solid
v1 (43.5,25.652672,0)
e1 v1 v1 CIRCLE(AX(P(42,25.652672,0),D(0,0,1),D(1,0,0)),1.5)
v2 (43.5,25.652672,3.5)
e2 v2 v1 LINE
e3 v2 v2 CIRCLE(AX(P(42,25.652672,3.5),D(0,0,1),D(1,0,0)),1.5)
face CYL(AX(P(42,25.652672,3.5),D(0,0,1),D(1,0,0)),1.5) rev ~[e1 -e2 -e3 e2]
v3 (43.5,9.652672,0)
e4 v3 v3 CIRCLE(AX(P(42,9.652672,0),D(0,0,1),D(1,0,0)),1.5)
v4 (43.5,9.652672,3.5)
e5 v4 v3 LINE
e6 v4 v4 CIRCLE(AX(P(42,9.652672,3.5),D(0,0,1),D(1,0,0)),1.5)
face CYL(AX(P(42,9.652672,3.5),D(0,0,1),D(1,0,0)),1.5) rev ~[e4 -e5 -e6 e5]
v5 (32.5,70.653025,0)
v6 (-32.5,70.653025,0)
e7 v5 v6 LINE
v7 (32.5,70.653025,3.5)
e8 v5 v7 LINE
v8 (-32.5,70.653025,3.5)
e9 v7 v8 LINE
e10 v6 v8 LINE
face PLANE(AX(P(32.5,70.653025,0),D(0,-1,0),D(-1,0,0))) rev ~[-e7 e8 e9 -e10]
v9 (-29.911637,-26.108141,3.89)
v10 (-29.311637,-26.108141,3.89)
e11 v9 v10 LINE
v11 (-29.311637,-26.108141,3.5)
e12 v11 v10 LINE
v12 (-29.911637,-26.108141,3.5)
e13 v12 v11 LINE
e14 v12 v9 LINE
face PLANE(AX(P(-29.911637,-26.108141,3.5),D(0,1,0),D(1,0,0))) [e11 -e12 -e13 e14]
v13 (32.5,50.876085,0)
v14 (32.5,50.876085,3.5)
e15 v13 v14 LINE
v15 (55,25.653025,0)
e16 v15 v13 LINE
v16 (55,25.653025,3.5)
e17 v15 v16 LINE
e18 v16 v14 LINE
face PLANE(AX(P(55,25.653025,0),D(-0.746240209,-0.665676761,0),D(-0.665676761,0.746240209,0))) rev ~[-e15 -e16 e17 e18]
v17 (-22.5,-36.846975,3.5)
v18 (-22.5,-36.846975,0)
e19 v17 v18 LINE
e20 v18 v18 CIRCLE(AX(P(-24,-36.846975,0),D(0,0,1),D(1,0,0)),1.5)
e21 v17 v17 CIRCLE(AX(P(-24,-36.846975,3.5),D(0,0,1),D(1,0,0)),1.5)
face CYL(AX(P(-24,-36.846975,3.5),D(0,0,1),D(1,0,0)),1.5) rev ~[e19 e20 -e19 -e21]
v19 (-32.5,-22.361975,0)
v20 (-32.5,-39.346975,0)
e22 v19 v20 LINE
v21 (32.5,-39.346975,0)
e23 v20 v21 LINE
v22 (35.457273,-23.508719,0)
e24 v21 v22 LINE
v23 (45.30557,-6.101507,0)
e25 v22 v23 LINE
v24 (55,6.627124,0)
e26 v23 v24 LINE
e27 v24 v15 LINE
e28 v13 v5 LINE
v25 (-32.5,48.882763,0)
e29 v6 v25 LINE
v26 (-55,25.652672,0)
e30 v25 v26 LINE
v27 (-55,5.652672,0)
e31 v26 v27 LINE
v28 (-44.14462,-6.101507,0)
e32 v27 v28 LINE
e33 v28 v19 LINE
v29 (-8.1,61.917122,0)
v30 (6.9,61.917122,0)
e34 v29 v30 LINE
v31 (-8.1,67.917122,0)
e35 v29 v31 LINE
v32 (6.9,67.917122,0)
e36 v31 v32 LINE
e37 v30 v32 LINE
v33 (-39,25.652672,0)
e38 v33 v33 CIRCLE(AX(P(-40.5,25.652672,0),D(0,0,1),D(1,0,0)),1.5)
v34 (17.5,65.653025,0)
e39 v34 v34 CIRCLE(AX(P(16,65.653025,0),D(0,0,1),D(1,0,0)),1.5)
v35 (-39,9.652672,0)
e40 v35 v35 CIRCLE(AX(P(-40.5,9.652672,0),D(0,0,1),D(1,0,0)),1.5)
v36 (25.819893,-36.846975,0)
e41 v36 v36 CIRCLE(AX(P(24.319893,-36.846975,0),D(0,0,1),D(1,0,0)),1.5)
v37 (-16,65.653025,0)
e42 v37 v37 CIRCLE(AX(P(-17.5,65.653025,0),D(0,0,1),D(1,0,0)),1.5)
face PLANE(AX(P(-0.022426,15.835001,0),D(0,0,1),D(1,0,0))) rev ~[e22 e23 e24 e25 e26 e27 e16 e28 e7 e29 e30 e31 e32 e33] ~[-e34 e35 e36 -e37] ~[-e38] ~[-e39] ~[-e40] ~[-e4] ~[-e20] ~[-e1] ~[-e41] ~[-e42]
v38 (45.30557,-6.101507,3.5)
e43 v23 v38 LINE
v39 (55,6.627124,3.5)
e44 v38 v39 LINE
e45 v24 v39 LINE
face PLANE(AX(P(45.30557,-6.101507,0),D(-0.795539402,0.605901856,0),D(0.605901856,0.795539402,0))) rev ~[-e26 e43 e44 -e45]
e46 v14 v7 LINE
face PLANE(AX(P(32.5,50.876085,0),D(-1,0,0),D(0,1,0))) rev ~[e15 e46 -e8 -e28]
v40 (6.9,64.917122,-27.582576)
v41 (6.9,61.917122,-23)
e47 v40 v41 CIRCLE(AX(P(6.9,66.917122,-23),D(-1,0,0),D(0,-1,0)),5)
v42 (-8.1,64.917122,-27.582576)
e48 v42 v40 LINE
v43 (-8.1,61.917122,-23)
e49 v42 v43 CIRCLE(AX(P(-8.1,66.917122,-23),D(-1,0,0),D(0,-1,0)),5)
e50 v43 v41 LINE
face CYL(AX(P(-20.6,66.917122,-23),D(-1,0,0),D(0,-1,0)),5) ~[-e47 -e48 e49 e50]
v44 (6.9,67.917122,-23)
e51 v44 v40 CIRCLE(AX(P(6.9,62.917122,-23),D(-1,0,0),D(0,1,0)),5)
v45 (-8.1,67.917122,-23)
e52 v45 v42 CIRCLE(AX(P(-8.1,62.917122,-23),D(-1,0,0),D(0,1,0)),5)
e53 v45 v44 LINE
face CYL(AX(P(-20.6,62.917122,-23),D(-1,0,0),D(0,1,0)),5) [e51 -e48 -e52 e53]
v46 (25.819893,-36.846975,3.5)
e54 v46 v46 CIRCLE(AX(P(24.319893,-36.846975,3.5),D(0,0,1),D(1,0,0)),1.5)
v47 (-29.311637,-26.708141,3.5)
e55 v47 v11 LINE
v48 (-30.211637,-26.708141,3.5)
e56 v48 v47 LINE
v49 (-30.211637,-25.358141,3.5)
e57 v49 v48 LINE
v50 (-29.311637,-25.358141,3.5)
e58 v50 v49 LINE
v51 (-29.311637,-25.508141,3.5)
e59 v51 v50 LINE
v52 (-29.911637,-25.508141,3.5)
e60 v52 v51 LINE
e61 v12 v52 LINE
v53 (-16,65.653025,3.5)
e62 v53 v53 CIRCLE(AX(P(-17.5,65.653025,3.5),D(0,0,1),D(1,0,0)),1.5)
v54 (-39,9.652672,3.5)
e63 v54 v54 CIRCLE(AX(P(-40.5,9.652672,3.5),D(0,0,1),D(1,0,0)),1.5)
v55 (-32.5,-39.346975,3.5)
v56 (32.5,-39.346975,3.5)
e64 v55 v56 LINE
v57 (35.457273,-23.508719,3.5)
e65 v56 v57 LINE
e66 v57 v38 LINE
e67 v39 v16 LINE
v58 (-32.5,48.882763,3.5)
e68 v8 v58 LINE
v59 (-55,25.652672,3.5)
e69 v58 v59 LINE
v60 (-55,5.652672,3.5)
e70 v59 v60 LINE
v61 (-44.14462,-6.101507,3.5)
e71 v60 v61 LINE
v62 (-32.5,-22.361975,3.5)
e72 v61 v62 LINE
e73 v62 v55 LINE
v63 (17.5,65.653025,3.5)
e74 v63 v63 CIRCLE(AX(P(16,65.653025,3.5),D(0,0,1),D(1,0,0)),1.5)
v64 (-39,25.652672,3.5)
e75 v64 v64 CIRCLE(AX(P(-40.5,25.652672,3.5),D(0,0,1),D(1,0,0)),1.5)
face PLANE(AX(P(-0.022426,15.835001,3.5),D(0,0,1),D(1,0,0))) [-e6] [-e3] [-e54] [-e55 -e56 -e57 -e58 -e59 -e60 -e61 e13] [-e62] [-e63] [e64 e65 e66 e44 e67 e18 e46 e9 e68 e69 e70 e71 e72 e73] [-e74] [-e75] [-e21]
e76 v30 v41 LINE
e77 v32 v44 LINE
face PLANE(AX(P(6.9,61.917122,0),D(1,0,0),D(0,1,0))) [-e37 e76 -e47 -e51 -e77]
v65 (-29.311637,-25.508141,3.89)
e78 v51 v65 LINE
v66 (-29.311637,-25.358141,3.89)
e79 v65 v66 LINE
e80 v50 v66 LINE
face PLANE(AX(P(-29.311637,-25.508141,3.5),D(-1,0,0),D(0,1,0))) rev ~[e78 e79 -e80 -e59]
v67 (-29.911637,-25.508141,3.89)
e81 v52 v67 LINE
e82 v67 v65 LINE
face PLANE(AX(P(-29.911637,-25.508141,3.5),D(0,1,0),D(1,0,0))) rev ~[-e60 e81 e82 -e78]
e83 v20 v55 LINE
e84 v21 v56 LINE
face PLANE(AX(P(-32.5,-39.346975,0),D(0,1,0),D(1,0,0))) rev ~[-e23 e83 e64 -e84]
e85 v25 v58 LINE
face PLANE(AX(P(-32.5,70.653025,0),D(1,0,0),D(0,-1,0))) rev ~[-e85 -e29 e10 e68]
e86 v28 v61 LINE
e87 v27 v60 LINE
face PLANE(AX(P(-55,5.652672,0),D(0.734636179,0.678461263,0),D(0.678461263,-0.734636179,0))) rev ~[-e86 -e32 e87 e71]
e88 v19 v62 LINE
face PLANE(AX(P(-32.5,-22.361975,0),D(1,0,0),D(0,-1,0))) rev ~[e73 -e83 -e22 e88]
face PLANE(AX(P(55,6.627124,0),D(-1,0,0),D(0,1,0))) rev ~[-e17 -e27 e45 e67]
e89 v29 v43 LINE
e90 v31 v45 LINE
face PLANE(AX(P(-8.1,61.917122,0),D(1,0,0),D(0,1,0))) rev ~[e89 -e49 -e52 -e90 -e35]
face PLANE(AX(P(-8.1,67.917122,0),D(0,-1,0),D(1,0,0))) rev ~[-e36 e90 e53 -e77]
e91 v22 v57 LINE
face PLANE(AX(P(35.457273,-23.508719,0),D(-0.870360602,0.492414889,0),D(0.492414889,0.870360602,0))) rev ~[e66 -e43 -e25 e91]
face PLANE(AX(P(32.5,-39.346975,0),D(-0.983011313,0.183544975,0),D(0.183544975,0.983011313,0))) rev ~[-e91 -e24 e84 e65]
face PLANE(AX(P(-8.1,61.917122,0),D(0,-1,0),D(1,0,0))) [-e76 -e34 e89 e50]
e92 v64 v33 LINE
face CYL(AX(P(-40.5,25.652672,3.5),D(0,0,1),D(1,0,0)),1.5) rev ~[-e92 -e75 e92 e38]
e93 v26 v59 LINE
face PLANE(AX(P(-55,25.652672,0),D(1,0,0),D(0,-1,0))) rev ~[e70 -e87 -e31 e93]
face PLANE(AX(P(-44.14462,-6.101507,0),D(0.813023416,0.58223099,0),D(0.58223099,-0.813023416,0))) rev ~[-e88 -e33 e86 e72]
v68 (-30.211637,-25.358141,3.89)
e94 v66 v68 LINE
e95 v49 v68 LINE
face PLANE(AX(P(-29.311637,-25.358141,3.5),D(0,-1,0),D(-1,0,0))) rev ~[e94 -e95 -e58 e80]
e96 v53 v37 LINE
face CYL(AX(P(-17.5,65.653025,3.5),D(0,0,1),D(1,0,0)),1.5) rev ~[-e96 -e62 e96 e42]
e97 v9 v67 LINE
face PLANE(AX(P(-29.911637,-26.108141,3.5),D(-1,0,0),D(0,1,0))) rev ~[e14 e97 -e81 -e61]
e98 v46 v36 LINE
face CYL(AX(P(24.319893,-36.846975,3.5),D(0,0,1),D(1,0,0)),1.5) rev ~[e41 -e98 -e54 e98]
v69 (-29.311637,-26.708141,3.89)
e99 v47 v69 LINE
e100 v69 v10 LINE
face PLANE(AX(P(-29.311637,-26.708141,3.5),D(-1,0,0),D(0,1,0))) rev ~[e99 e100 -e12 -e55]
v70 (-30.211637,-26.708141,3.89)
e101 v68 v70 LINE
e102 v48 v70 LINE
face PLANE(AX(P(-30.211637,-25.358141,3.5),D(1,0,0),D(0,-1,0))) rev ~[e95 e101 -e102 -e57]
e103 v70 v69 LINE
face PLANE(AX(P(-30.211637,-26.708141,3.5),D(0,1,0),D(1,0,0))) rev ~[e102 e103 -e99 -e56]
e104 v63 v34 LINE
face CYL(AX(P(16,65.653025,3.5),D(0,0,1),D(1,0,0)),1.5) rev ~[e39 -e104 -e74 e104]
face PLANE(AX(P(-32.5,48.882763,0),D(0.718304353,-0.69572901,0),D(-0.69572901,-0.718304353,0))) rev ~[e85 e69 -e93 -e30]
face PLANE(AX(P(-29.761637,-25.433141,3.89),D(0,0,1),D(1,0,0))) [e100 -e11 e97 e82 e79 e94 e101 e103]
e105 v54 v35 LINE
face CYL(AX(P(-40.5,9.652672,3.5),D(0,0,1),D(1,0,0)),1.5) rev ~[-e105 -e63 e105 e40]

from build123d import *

# Parameters (mm, degrees)
F2_DEPTH    = 3.5
F3_R        = 1.5
F4_DEPTH    = 25
F5_W        = 15
F5_H        = 6
F6_DEPTH    = 28
F7_T1_DEPTH = 40
F8_W        = 0.6
F8_H        = 0.6
F9_DEPTH    = 0.39


# Not quite as in the source:
# - a fillet or chamfer that OpenCascade refuses, or shapes differently, is made with other operations: its cross-section is extruded or revolved along the edge and cut away or added


with BuildPart() as f2:
    # F0 (on Top) → F2 (new body)
    with BuildSketch(Plane.XY):
        Polygon((32.5, 70.6530249731), (-32.5, 70.6530249731), (-32.5, 59.4207410195), (-32.5, 48.8827627578), (-55, 25.6526721455), (-55, 5.6526721455), (-44.1446197954, -6.101506712), (-32.5, -22.3619750269), (-32.5, -39.3469750269), (32.5, -39.3469750269), (35.4572725267, -23.5087187488), (45.3055703038, -6.101506712), (55, 6.6271237275), (55, 25.6530249731), (32.5, 50.8760847151), align=None)
    extrude(amount=F2_DEPTH)

    # F3 (on face) → F4 (cut)
    with BuildSketch(Plane.XY.offset(3.5)):
        with Locations((-17.5, 65.6530249731)):
            Circle(F3_R)
        with Locations((16, 65.6530249731)):
            Circle(F3_R)
        with Locations((-40.5, 25.6526721455)):
            Circle(F3_R)
        with Locations((-40.5, 9.6526721455)):
            Circle(F3_R)
        with Locations((42, 25.6526721455)):
            Circle(F3_R)
        with Locations((42, 9.6526721455)):
            Circle(F3_R)
        with Locations((24.3198931655, -36.8469750269)):
            Circle(F3_R)
        with Locations((-24, -36.8469750269)):
            Circle(F3_R)
    extrude(amount=-F4_DEPTH, mode=Mode.SUBTRACT)

    # F5 (on face) → F6 (join)
    with BuildSketch(Plane.XY):
        with Locations((-0.6, 64.9171224535)):
            Rectangle(F5_W, F5_H)
    extrude(amount=-F6_DEPTH)

    # F7: fillet of radius 5 on 2 edges, made by hand

    # F7_s2 → F7_t1 (cut)
    with BuildSketch(Plane.YZ.offset(-20.6)):
        with BuildLine():
            ThreePointArc((61.9171224535, -23), (63.3815885475, -26.5355339059), (66.9171224535, -28))
            Line((66.9171224535, -28), (61.9171224535, -28))
            Line((61.9171224535, -28), (61.9171224535, -23))
        make_face()
        with BuildLine():
            ThreePointArc((67.9171224535, -23), (66.4526563594, -26.5355339059), (62.9171224535, -28))
            Line((62.9171224535, -28), (67.9171224535, -28))
            Line((67.9171224535, -28), (67.9171224535, -23))
        make_face()
    extrude(amount=F7_T1_DEPTH, mode=Mode.SUBTRACT)

    # F8 (on face) → F9 (join)
    with BuildSketch(Plane.XY.offset(3.5)):
        Polygon((-30.2116373062, -25.3581409693), (-30.2116373062, -25.5081409693), (-30.0116373062, -25.5081409693), (-29.9116373062, -25.5081409693), (-29.3116373062, -25.5081409693), (-29.3116373062, -25.3581409693), align=None)
        Polygon((-30.0116373062, -25.5081409693), (-30.2116373062, -25.5081409693), (-30.2116373062, -26.7081409693), (-29.9116373062, -26.7081409693), (-29.9116373062, -26.1081409693), (-29.9116373062, -25.5081409693), align=None)
        with Locations((-29.6116373062, -26.4081409693)):
            Rectangle(F8_W, F8_H)
    extrude(amount=F9_DEPTH)


solid = f2.part
